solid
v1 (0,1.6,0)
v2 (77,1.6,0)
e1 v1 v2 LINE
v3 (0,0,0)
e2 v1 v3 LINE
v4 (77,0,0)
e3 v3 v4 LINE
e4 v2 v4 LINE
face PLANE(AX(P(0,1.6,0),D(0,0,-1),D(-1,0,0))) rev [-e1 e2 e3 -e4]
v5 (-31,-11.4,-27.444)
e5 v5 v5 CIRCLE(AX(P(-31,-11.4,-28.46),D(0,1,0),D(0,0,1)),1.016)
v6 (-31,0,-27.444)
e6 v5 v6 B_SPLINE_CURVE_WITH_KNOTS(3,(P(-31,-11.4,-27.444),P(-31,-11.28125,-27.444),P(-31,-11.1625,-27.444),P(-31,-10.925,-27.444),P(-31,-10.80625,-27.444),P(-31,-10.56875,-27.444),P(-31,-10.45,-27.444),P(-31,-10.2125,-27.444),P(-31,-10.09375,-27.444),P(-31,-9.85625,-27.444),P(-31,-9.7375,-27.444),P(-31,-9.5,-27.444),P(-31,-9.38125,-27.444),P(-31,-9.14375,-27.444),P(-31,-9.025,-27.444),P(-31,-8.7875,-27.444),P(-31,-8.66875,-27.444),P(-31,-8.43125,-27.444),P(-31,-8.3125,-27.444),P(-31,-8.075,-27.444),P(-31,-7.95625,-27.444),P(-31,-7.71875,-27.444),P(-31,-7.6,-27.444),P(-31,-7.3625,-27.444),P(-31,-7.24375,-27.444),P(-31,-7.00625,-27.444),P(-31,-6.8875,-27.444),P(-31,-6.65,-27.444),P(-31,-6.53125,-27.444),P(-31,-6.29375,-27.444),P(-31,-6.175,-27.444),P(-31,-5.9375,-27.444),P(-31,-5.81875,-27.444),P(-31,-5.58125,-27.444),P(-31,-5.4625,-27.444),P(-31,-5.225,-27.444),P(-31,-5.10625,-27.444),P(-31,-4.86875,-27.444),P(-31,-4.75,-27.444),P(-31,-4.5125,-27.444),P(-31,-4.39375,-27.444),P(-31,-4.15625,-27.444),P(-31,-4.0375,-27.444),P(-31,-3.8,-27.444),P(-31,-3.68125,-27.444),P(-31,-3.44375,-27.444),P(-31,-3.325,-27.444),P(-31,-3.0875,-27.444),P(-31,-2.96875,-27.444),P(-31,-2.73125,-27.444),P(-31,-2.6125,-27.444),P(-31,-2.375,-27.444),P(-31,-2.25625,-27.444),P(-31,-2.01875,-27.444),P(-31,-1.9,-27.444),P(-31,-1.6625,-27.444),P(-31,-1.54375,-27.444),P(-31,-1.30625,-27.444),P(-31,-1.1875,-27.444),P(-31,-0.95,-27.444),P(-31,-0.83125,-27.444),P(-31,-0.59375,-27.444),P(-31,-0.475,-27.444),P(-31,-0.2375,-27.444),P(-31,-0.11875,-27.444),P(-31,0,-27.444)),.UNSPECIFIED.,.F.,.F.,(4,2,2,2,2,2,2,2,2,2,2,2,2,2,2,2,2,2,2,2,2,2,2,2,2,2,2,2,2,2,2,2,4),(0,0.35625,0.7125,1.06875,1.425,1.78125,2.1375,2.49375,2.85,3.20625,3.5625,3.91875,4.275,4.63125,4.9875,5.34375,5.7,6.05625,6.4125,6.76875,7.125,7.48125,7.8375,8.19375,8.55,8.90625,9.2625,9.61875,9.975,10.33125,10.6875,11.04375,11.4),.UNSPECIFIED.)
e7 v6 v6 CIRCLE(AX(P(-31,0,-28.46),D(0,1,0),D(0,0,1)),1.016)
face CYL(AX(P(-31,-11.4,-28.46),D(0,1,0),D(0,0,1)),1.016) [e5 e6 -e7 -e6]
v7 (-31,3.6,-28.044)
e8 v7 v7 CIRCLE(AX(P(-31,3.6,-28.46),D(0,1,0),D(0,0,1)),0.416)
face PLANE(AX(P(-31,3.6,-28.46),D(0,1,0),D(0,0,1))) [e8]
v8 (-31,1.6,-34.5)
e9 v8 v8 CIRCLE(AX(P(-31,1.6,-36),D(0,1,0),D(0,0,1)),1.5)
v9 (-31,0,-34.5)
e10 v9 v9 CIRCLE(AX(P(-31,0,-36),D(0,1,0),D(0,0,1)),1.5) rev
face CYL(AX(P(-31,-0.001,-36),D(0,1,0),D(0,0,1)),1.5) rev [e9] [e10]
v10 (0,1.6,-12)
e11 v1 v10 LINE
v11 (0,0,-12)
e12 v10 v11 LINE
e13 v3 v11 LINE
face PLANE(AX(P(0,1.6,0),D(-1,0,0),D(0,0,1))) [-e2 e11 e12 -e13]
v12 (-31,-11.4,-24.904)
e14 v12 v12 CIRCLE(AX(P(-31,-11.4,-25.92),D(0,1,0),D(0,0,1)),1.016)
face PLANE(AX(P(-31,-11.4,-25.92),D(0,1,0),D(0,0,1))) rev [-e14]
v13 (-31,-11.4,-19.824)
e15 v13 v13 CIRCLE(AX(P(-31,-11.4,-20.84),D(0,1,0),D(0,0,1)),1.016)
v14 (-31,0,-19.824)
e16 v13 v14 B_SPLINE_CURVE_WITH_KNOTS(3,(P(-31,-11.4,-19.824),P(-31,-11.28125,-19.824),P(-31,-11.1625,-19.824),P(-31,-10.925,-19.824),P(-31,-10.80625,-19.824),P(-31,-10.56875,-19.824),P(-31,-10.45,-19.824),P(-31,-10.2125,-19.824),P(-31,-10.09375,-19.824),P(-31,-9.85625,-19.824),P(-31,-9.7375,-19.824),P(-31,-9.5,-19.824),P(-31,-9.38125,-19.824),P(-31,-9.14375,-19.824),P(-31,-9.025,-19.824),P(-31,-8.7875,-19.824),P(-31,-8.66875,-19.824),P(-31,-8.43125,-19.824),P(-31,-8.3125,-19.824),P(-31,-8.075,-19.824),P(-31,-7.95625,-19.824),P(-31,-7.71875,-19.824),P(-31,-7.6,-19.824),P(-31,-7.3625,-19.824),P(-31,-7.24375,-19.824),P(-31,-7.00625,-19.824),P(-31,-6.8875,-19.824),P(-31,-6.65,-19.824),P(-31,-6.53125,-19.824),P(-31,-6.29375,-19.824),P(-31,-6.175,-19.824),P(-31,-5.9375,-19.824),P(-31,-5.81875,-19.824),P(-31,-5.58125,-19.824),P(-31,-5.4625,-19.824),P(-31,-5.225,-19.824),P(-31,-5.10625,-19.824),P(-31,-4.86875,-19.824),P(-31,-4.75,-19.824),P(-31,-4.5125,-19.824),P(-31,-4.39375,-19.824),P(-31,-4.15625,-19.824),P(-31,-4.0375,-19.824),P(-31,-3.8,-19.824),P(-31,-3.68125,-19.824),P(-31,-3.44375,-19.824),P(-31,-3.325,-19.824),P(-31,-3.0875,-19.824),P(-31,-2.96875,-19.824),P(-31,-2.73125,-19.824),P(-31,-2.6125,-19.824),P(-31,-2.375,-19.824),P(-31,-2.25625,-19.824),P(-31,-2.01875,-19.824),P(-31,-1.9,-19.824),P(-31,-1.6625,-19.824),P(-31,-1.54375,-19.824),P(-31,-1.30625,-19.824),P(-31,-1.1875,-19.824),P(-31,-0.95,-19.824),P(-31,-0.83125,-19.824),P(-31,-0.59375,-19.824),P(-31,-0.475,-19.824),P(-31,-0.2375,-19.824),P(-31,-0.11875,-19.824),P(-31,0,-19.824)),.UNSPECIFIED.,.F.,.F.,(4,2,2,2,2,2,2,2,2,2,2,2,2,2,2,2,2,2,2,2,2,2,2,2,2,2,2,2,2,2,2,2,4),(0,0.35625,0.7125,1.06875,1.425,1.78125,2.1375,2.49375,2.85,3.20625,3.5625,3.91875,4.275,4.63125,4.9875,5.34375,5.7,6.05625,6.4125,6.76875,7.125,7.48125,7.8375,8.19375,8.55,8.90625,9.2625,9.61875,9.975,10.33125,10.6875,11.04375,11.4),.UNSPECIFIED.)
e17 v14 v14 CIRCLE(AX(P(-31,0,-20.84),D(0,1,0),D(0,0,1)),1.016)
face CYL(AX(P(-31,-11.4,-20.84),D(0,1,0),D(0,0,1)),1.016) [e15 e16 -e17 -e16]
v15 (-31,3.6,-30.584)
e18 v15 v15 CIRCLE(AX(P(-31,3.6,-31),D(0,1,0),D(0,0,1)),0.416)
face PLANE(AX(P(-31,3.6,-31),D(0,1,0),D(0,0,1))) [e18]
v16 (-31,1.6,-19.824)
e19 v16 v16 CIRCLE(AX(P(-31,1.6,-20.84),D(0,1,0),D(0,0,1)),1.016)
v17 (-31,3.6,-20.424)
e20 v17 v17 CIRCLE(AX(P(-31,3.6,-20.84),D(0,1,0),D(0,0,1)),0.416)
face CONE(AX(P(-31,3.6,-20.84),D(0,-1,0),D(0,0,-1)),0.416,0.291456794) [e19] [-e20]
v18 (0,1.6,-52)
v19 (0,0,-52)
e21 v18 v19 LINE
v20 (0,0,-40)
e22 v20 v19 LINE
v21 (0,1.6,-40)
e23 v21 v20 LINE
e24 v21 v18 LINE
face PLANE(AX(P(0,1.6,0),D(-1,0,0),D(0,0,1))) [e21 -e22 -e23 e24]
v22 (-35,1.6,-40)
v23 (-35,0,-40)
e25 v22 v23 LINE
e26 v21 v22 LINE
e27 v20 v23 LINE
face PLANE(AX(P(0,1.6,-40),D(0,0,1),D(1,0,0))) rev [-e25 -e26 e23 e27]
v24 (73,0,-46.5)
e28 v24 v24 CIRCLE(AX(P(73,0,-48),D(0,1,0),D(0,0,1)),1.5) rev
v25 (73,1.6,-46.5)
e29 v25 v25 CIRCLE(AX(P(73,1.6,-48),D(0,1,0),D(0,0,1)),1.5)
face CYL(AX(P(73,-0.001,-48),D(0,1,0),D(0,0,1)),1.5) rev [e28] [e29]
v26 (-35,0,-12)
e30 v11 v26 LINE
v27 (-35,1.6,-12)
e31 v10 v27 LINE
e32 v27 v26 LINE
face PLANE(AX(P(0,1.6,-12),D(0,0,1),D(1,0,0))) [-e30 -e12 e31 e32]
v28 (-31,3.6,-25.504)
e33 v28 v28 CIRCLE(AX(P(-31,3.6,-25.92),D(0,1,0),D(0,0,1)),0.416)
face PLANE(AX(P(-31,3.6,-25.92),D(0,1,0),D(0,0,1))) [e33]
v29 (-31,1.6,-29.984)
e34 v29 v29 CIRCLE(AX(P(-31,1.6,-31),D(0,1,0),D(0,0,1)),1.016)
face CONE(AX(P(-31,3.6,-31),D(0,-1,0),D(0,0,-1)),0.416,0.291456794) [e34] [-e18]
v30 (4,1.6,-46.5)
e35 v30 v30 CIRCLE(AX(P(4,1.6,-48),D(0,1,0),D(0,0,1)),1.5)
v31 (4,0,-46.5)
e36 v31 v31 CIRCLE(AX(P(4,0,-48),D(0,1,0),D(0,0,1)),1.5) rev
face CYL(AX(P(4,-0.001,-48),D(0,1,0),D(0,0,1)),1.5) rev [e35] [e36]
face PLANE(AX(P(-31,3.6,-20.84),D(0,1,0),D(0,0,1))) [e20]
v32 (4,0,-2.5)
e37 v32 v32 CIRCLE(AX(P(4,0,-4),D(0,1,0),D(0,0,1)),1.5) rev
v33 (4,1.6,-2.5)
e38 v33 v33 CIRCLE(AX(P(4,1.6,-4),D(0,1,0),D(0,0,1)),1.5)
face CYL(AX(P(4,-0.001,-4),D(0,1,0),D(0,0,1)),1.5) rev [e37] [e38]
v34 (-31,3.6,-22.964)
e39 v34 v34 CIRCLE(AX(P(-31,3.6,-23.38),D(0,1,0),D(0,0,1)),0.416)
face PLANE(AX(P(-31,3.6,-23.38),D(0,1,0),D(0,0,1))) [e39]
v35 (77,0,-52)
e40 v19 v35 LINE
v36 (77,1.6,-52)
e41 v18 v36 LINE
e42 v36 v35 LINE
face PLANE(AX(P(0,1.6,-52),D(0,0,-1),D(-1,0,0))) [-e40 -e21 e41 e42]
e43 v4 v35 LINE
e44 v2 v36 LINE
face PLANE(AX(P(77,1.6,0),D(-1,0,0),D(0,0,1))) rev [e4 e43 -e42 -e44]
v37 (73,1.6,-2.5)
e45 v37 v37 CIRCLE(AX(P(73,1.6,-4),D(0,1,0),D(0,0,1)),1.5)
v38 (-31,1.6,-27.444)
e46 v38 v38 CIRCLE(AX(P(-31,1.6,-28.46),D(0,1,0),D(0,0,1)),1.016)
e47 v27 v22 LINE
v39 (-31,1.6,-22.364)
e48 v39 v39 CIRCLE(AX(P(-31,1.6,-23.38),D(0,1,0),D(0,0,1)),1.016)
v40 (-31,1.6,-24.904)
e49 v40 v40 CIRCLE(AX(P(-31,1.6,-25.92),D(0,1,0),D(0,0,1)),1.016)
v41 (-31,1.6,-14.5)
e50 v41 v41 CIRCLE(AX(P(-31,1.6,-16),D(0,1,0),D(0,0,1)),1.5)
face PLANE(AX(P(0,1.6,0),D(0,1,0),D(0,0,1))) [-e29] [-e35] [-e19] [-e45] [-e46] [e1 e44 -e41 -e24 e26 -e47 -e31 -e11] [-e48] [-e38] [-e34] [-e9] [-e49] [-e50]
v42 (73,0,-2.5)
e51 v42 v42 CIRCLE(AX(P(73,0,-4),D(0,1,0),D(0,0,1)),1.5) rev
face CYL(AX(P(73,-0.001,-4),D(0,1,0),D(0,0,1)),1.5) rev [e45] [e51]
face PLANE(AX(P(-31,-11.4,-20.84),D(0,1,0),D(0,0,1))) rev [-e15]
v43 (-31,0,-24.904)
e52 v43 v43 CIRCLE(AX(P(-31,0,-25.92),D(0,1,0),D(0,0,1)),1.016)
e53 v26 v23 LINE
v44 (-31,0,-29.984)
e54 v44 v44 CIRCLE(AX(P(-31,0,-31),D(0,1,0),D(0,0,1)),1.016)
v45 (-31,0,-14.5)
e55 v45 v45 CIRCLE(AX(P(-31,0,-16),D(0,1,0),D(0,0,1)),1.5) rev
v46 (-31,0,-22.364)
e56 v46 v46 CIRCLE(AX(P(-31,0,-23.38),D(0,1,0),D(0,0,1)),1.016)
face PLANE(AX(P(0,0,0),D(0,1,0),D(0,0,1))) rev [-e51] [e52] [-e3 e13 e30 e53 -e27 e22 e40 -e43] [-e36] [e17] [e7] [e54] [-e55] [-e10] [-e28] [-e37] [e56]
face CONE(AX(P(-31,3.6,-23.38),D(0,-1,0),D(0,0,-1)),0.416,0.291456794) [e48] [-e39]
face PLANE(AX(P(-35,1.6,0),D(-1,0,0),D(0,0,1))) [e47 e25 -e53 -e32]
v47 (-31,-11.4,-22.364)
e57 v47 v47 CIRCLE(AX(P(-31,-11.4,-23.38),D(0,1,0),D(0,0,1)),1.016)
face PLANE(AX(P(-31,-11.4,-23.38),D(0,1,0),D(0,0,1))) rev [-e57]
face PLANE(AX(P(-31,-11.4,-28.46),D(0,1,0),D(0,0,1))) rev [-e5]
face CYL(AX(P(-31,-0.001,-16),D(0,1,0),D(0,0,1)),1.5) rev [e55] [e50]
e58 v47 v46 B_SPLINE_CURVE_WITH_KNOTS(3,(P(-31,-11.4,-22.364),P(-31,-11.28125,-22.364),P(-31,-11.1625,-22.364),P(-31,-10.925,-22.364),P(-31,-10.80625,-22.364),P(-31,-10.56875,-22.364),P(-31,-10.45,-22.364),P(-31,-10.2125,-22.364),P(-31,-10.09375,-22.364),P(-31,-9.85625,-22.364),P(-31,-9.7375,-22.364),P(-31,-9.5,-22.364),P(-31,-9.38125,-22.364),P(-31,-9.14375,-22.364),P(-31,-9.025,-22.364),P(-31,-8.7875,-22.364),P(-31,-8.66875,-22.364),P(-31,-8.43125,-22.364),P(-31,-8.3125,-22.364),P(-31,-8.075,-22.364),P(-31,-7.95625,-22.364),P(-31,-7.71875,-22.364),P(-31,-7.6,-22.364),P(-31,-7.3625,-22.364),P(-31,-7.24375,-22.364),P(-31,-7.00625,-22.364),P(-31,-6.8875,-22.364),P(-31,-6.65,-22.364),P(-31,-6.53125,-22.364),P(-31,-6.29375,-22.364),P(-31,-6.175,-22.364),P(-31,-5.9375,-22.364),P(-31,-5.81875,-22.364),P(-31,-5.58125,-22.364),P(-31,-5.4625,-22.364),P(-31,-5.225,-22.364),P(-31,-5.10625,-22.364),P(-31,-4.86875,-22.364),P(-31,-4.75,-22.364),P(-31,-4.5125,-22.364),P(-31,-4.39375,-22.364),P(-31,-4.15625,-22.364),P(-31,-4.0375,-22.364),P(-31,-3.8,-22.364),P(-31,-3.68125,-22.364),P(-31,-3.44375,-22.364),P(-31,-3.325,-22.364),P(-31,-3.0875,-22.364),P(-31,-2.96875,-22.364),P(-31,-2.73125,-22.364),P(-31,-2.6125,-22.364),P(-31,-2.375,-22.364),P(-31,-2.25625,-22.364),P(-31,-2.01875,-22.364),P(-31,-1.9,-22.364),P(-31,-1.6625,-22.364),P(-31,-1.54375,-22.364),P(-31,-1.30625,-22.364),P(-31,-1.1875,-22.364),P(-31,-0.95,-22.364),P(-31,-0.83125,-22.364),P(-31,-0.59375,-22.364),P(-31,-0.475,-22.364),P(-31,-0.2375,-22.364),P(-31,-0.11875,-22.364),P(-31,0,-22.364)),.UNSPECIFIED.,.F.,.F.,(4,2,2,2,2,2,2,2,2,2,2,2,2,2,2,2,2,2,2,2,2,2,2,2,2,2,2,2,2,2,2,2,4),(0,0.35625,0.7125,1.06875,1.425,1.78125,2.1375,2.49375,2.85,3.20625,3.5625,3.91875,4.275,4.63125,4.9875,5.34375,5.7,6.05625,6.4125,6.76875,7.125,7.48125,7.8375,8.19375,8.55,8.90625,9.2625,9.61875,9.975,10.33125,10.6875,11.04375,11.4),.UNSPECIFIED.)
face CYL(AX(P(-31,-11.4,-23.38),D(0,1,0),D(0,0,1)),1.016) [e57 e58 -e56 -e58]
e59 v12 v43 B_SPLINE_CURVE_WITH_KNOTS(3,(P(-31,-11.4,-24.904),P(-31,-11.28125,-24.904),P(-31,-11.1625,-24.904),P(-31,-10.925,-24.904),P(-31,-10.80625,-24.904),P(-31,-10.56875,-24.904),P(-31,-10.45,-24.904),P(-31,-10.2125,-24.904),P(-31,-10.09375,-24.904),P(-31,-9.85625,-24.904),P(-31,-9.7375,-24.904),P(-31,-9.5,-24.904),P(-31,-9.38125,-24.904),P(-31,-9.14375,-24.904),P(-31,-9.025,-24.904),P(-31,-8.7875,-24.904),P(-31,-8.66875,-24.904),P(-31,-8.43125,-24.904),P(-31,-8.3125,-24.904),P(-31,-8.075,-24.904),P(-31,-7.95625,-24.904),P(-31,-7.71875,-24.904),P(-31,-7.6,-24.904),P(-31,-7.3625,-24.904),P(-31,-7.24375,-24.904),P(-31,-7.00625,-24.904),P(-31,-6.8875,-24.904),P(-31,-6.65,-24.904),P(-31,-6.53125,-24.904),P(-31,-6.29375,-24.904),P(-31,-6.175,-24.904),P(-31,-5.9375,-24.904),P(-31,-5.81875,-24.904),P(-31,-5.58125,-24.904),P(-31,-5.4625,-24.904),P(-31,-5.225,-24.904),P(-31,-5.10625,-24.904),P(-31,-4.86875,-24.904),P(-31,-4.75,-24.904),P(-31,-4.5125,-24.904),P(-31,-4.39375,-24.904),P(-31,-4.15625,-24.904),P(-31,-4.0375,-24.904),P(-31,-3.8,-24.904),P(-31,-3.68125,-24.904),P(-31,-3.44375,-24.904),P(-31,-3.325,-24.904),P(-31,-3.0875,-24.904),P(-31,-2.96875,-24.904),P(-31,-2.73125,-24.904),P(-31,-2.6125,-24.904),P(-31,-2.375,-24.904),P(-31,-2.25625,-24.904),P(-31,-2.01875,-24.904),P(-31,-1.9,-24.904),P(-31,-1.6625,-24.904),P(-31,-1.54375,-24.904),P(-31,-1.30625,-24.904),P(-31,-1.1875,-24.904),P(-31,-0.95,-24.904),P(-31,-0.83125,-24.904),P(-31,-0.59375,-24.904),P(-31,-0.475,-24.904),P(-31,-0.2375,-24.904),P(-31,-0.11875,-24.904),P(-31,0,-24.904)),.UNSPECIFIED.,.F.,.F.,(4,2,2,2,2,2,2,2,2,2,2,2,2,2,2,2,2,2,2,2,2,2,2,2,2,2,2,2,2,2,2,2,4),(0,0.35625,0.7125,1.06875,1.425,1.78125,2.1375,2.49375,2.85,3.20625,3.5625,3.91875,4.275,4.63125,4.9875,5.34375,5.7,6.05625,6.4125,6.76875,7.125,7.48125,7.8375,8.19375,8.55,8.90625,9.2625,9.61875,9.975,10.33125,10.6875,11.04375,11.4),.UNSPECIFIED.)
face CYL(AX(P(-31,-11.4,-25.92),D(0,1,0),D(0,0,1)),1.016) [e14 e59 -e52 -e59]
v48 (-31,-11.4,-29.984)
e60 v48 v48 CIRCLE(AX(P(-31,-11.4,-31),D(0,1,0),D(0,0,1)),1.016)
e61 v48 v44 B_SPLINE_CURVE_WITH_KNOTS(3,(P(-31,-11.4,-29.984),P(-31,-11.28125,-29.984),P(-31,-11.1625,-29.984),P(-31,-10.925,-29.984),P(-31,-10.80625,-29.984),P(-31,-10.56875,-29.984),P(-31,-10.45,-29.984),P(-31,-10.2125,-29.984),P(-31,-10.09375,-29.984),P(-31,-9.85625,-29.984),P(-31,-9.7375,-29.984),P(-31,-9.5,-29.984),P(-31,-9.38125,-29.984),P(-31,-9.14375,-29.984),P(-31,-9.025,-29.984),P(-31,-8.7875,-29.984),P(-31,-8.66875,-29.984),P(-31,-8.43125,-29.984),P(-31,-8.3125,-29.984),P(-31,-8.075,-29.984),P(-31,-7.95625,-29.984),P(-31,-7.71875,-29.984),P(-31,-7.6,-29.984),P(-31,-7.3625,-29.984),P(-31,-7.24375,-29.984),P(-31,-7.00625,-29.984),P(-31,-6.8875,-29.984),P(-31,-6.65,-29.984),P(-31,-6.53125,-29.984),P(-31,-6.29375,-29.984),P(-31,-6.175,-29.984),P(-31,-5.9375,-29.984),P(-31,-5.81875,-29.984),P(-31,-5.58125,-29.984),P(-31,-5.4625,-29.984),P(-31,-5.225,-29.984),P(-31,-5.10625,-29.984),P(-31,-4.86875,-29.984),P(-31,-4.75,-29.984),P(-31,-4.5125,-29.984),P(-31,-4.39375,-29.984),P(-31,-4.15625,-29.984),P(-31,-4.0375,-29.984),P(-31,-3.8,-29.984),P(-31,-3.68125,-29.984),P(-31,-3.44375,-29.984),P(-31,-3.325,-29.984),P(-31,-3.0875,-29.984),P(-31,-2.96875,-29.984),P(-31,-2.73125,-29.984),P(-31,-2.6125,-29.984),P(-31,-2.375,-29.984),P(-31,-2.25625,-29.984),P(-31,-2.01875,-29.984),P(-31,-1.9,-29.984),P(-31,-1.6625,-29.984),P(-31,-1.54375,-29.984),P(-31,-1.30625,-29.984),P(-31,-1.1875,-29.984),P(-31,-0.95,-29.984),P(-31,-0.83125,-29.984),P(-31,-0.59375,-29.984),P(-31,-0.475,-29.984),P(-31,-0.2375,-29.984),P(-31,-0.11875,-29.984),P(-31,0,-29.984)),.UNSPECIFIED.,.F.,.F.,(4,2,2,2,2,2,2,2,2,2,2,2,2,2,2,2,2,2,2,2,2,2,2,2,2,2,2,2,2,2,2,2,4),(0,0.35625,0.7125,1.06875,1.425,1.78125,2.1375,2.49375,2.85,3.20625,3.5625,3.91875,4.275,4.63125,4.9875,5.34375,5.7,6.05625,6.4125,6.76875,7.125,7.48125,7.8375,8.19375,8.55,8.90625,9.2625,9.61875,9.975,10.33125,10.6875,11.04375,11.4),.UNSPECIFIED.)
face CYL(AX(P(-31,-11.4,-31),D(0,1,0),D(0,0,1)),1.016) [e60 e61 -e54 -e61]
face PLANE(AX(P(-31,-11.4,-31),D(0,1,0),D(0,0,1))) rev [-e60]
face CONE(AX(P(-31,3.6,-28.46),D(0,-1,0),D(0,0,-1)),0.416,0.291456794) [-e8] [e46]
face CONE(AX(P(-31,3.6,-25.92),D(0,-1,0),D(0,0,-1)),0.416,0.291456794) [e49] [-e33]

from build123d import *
from OCP.BRepFilletAPI import BRepFilletAPI_MakeChamfer

# Parameters (mm, degrees)
ESQUISSE1_W             = 35
ESQUISSE1_H             = 28
ESQUISSE1_W_2           = 77
ESQUISSE1_H_2           = 52
BOSS_EXTRU_1_DEPTH      = 1.6
ENL_V_MAT_EXTRU_1_REACH = 94.928
ESQUISSE2_R             = 1.5
BOSS_EXTRU_2_DEPTH      = 2
BOSS_EXTRU_2_DEPTH_BACK = 13
ESQUISSE3_R             = 1.016
CHANFREIN1_SIZE         = 2
CHANFREIN1_SIZE_2       = 0.6


with BuildPart() as part:
    # Esquisse1 → Boss.-Extru.1 (new body)
    with BuildSketch(Plane(origin=(0, 0, 0), x_dir=(1, 0, 0), z_dir=(0, 1, 0))):
        with Locations((-17.5, 26)):
            Rectangle(ESQUISSE1_W, ESQUISSE1_H)
        with Locations((38.5, 26)):
            Rectangle(ESQUISSE1_W_2, ESQUISSE1_H_2)
    extrude(amount=BOSS_EXTRU_1_DEPTH)

    # Esquisse2 → Enlèv. mat.-Extru.1 (cut, up to next)
    with BuildSketch(Plane(origin=(0, 1.6, 0), x_dir=(1, 0, 0), z_dir=(0, 1, 0)), mode=Mode.PRIVATE) as enl_v_mat_extru_1_sk1:
        with Locations(Location((-31, 36, 0), (0, 0, 270))):
            Circle(ESQUISSE2_R)
    enl_v_mat_extru_1_tool1 = extrude(enl_v_mat_extru_1_sk1.sketch, amount=-ENL_V_MAT_EXTRU_1_REACH, mode=Mode.PRIVATE) & part.part
    # Esquisse2 → Enlèv. mat.-Extru.1 (cut, up to next)
    with BuildSketch(Plane(origin=(0, 1.6, 0), x_dir=(1, 0, 0), z_dir=(0, 1, 0)), mode=Mode.PRIVATE) as enl_v_mat_extru_1_sk2:
        with Locations(Location((-31, 16, 0), (0, 0, 270))):
            Circle(ESQUISSE2_R)
    enl_v_mat_extru_1_tool2 = extrude(enl_v_mat_extru_1_sk2.sketch, amount=-ENL_V_MAT_EXTRU_1_REACH, mode=Mode.PRIVATE) & part.part
    # Esquisse2 → Enlèv. mat.-Extru.1 (cut, up to next)
    with BuildSketch(Plane(origin=(0, 1.6, 0), x_dir=(1, 0, 0), z_dir=(0, 1, 0)), mode=Mode.PRIVATE) as enl_v_mat_extru_1_sk3:
        with Locations(Location((4, 4, 0), (0, 0, 270))):
            Circle(ESQUISSE2_R)
    enl_v_mat_extru_1_tool3 = extrude(enl_v_mat_extru_1_sk3.sketch, amount=-ENL_V_MAT_EXTRU_1_REACH, mode=Mode.PRIVATE) & part.part
    # Esquisse2 → Enlèv. mat.-Extru.1 (cut, up to next)
    with BuildSketch(Plane(origin=(0, 1.6, 0), x_dir=(1, 0, 0), z_dir=(0, 1, 0)), mode=Mode.PRIVATE) as enl_v_mat_extru_1_sk4:
        with Locations(Location((4, 48, 0), (0, 0, 270))):
            Circle(ESQUISSE2_R)
    enl_v_mat_extru_1_tool4 = extrude(enl_v_mat_extru_1_sk4.sketch, amount=-ENL_V_MAT_EXTRU_1_REACH, mode=Mode.PRIVATE) & part.part
    # Esquisse2 → Enlèv. mat.-Extru.1 (cut, up to next)
    with BuildSketch(Plane(origin=(0, 1.6, 0), x_dir=(1, 0, 0), z_dir=(0, 1, 0)), mode=Mode.PRIVATE) as enl_v_mat_extru_1_sk5:
        with Locations(Location((73, 48, 0), (0, 0, 270))):
            Circle(ESQUISSE2_R)
    enl_v_mat_extru_1_tool5 = extrude(enl_v_mat_extru_1_sk5.sketch, amount=-ENL_V_MAT_EXTRU_1_REACH, mode=Mode.PRIVATE) & part.part
    # Esquisse2 → Enlèv. mat.-Extru.1 (cut, up to next)
    with BuildSketch(Plane(origin=(0, 1.6, 0), x_dir=(1, 0, 0), z_dir=(0, 1, 0)), mode=Mode.PRIVATE) as enl_v_mat_extru_1_sk6:
        with Locations(Location((73, 4, 0), (0, 0, 270))):
            Circle(ESQUISSE2_R)
    enl_v_mat_extru_1_tool6 = extrude(enl_v_mat_extru_1_sk6.sketch, amount=-ENL_V_MAT_EXTRU_1_REACH, mode=Mode.PRIVATE) & part.part
    add(enl_v_mat_extru_1_tool1.solids().sort_by_distance((-31, 1.6, -36))[0], mode=Mode.SUBTRACT)
    add(enl_v_mat_extru_1_tool2.solids().sort_by_distance((-31, 1.6, -16))[0], mode=Mode.SUBTRACT)
    add(enl_v_mat_extru_1_tool3.solids().sort_by_distance((4, 1.6, -4))[0], mode=Mode.SUBTRACT)
    add(enl_v_mat_extru_1_tool4.solids().sort_by_distance((4, 1.6, -48))[0], mode=Mode.SUBTRACT)
    add(enl_v_mat_extru_1_tool5.solids().sort_by_distance((73, 1.6, -48))[0], mode=Mode.SUBTRACT)
    add(enl_v_mat_extru_1_tool6.solids().sort_by_distance((73, 1.6, -4))[0], mode=Mode.SUBTRACT)

    # Esquisse3 → Boss.-Extru.2 (add, two sides: drawn at the far end of the back side and taken through both)
    with BuildSketch(Plane(origin=(0, 1.6, 0), x_dir=(1, 0, 0), z_dir=(0, 1, 0)).offset(-BOSS_EXTRU_2_DEPTH_BACK)):
        with Locations(Location((-31, 31, 0), (0, 0, 270))):
            Circle(ESQUISSE3_R)
        with Locations(Location((-31, 28.46, 0), (0, 0, 270))):
            Circle(ESQUISSE3_R)
        with Locations(Location((-31, 25.92, 0), (0, 0, 270))):
            Circle(ESQUISSE3_R)
        with Locations(Location((-31, 23.38, 0), (0, 0, 270))):
            Circle(ESQUISSE3_R)
        with Locations(Location((-31, 20.84, 0), (0, 0, 270))):
            Circle(ESQUISSE3_R)
    extrude(amount=BOSS_EXTRU_2_DEPTH + BOSS_EXTRU_2_DEPTH_BACK)

    # Chanfrein1
    chanfrein1_edges_1 = [part.edges().sort_by_distance(p)[0] for p in [
        (-31, 3.6, -32.016),
    ]]
    chanfrein1_side_1 = [part.faces().sort_by_distance(p)[0] for p in [
        (-31, 3.588, -32.016),
    ]]
    chanfrein1_edges_2 = [part.edges().sort_by_distance(p)[0] for p in [
        (-31, 3.6, -29.476),
    ]]
    chanfrein1_side_2 = [part.faces().sort_by_distance(p)[0] for p in [
        (-31, 3.588, -29.476),
    ]]
    chanfrein1_edges_3 = [part.edges().sort_by_distance(p)[0] for p in [
        (-31, 3.6, -26.936),
    ]]
    chanfrein1_side_3 = [part.faces().sort_by_distance(p)[0] for p in [
        (-31, 3.588, -26.936),
    ]]
    chanfrein1_edges_4 = [part.edges().sort_by_distance(p)[0] for p in [
        (-31, 3.6, -24.396),
    ]]
    chanfrein1_side_4 = [part.faces().sort_by_distance(p)[0] for p in [
        (-31, 3.588, -24.396),
    ]]
    chanfrein1_edges_5 = [part.edges().sort_by_distance(p)[0] for p in [
        (-31, 3.6, -21.856),
    ]]
    chanfrein1_side_5 = [part.faces().sort_by_distance(p)[0] for p in [
        (-31, 3.588, -21.856),
    ]]
    chanfrein1 = BRepFilletAPI_MakeChamfer(part.part.solid().wrapped)
    for e in chanfrein1_edges_1:
        chanfrein1.Add(CHANFREIN1_SIZE - 0.0001, CHANFREIN1_SIZE_2 - 0.0001, e.wrapped, chanfrein1_side_1[0].wrapped)
    for e in chanfrein1_edges_2:
        chanfrein1.Add(CHANFREIN1_SIZE - 0.0001, CHANFREIN1_SIZE_2 - 0.0001, e.wrapped, chanfrein1_side_2[0].wrapped)
    for e in chanfrein1_edges_3:
        chanfrein1.Add(CHANFREIN1_SIZE - 0.0001, CHANFREIN1_SIZE_2 - 0.0001, e.wrapped, chanfrein1_side_3[0].wrapped)
    for e in chanfrein1_edges_4:
        chanfrein1.Add(CHANFREIN1_SIZE - 0.0001, CHANFREIN1_SIZE_2 - 0.0001, e.wrapped, chanfrein1_side_4[0].wrapped)
    for e in chanfrein1_edges_5:
        chanfrein1.Add(CHANFREIN1_SIZE - 0.0001, CHANFREIN1_SIZE_2 - 0.0001, e.wrapped, chanfrein1_side_5[0].wrapped)
    add(Compound.cast(chanfrein1.Shape()), mode=Mode.REPLACE)  # a hair under: the kernel refuses the full size


solid = part.part
